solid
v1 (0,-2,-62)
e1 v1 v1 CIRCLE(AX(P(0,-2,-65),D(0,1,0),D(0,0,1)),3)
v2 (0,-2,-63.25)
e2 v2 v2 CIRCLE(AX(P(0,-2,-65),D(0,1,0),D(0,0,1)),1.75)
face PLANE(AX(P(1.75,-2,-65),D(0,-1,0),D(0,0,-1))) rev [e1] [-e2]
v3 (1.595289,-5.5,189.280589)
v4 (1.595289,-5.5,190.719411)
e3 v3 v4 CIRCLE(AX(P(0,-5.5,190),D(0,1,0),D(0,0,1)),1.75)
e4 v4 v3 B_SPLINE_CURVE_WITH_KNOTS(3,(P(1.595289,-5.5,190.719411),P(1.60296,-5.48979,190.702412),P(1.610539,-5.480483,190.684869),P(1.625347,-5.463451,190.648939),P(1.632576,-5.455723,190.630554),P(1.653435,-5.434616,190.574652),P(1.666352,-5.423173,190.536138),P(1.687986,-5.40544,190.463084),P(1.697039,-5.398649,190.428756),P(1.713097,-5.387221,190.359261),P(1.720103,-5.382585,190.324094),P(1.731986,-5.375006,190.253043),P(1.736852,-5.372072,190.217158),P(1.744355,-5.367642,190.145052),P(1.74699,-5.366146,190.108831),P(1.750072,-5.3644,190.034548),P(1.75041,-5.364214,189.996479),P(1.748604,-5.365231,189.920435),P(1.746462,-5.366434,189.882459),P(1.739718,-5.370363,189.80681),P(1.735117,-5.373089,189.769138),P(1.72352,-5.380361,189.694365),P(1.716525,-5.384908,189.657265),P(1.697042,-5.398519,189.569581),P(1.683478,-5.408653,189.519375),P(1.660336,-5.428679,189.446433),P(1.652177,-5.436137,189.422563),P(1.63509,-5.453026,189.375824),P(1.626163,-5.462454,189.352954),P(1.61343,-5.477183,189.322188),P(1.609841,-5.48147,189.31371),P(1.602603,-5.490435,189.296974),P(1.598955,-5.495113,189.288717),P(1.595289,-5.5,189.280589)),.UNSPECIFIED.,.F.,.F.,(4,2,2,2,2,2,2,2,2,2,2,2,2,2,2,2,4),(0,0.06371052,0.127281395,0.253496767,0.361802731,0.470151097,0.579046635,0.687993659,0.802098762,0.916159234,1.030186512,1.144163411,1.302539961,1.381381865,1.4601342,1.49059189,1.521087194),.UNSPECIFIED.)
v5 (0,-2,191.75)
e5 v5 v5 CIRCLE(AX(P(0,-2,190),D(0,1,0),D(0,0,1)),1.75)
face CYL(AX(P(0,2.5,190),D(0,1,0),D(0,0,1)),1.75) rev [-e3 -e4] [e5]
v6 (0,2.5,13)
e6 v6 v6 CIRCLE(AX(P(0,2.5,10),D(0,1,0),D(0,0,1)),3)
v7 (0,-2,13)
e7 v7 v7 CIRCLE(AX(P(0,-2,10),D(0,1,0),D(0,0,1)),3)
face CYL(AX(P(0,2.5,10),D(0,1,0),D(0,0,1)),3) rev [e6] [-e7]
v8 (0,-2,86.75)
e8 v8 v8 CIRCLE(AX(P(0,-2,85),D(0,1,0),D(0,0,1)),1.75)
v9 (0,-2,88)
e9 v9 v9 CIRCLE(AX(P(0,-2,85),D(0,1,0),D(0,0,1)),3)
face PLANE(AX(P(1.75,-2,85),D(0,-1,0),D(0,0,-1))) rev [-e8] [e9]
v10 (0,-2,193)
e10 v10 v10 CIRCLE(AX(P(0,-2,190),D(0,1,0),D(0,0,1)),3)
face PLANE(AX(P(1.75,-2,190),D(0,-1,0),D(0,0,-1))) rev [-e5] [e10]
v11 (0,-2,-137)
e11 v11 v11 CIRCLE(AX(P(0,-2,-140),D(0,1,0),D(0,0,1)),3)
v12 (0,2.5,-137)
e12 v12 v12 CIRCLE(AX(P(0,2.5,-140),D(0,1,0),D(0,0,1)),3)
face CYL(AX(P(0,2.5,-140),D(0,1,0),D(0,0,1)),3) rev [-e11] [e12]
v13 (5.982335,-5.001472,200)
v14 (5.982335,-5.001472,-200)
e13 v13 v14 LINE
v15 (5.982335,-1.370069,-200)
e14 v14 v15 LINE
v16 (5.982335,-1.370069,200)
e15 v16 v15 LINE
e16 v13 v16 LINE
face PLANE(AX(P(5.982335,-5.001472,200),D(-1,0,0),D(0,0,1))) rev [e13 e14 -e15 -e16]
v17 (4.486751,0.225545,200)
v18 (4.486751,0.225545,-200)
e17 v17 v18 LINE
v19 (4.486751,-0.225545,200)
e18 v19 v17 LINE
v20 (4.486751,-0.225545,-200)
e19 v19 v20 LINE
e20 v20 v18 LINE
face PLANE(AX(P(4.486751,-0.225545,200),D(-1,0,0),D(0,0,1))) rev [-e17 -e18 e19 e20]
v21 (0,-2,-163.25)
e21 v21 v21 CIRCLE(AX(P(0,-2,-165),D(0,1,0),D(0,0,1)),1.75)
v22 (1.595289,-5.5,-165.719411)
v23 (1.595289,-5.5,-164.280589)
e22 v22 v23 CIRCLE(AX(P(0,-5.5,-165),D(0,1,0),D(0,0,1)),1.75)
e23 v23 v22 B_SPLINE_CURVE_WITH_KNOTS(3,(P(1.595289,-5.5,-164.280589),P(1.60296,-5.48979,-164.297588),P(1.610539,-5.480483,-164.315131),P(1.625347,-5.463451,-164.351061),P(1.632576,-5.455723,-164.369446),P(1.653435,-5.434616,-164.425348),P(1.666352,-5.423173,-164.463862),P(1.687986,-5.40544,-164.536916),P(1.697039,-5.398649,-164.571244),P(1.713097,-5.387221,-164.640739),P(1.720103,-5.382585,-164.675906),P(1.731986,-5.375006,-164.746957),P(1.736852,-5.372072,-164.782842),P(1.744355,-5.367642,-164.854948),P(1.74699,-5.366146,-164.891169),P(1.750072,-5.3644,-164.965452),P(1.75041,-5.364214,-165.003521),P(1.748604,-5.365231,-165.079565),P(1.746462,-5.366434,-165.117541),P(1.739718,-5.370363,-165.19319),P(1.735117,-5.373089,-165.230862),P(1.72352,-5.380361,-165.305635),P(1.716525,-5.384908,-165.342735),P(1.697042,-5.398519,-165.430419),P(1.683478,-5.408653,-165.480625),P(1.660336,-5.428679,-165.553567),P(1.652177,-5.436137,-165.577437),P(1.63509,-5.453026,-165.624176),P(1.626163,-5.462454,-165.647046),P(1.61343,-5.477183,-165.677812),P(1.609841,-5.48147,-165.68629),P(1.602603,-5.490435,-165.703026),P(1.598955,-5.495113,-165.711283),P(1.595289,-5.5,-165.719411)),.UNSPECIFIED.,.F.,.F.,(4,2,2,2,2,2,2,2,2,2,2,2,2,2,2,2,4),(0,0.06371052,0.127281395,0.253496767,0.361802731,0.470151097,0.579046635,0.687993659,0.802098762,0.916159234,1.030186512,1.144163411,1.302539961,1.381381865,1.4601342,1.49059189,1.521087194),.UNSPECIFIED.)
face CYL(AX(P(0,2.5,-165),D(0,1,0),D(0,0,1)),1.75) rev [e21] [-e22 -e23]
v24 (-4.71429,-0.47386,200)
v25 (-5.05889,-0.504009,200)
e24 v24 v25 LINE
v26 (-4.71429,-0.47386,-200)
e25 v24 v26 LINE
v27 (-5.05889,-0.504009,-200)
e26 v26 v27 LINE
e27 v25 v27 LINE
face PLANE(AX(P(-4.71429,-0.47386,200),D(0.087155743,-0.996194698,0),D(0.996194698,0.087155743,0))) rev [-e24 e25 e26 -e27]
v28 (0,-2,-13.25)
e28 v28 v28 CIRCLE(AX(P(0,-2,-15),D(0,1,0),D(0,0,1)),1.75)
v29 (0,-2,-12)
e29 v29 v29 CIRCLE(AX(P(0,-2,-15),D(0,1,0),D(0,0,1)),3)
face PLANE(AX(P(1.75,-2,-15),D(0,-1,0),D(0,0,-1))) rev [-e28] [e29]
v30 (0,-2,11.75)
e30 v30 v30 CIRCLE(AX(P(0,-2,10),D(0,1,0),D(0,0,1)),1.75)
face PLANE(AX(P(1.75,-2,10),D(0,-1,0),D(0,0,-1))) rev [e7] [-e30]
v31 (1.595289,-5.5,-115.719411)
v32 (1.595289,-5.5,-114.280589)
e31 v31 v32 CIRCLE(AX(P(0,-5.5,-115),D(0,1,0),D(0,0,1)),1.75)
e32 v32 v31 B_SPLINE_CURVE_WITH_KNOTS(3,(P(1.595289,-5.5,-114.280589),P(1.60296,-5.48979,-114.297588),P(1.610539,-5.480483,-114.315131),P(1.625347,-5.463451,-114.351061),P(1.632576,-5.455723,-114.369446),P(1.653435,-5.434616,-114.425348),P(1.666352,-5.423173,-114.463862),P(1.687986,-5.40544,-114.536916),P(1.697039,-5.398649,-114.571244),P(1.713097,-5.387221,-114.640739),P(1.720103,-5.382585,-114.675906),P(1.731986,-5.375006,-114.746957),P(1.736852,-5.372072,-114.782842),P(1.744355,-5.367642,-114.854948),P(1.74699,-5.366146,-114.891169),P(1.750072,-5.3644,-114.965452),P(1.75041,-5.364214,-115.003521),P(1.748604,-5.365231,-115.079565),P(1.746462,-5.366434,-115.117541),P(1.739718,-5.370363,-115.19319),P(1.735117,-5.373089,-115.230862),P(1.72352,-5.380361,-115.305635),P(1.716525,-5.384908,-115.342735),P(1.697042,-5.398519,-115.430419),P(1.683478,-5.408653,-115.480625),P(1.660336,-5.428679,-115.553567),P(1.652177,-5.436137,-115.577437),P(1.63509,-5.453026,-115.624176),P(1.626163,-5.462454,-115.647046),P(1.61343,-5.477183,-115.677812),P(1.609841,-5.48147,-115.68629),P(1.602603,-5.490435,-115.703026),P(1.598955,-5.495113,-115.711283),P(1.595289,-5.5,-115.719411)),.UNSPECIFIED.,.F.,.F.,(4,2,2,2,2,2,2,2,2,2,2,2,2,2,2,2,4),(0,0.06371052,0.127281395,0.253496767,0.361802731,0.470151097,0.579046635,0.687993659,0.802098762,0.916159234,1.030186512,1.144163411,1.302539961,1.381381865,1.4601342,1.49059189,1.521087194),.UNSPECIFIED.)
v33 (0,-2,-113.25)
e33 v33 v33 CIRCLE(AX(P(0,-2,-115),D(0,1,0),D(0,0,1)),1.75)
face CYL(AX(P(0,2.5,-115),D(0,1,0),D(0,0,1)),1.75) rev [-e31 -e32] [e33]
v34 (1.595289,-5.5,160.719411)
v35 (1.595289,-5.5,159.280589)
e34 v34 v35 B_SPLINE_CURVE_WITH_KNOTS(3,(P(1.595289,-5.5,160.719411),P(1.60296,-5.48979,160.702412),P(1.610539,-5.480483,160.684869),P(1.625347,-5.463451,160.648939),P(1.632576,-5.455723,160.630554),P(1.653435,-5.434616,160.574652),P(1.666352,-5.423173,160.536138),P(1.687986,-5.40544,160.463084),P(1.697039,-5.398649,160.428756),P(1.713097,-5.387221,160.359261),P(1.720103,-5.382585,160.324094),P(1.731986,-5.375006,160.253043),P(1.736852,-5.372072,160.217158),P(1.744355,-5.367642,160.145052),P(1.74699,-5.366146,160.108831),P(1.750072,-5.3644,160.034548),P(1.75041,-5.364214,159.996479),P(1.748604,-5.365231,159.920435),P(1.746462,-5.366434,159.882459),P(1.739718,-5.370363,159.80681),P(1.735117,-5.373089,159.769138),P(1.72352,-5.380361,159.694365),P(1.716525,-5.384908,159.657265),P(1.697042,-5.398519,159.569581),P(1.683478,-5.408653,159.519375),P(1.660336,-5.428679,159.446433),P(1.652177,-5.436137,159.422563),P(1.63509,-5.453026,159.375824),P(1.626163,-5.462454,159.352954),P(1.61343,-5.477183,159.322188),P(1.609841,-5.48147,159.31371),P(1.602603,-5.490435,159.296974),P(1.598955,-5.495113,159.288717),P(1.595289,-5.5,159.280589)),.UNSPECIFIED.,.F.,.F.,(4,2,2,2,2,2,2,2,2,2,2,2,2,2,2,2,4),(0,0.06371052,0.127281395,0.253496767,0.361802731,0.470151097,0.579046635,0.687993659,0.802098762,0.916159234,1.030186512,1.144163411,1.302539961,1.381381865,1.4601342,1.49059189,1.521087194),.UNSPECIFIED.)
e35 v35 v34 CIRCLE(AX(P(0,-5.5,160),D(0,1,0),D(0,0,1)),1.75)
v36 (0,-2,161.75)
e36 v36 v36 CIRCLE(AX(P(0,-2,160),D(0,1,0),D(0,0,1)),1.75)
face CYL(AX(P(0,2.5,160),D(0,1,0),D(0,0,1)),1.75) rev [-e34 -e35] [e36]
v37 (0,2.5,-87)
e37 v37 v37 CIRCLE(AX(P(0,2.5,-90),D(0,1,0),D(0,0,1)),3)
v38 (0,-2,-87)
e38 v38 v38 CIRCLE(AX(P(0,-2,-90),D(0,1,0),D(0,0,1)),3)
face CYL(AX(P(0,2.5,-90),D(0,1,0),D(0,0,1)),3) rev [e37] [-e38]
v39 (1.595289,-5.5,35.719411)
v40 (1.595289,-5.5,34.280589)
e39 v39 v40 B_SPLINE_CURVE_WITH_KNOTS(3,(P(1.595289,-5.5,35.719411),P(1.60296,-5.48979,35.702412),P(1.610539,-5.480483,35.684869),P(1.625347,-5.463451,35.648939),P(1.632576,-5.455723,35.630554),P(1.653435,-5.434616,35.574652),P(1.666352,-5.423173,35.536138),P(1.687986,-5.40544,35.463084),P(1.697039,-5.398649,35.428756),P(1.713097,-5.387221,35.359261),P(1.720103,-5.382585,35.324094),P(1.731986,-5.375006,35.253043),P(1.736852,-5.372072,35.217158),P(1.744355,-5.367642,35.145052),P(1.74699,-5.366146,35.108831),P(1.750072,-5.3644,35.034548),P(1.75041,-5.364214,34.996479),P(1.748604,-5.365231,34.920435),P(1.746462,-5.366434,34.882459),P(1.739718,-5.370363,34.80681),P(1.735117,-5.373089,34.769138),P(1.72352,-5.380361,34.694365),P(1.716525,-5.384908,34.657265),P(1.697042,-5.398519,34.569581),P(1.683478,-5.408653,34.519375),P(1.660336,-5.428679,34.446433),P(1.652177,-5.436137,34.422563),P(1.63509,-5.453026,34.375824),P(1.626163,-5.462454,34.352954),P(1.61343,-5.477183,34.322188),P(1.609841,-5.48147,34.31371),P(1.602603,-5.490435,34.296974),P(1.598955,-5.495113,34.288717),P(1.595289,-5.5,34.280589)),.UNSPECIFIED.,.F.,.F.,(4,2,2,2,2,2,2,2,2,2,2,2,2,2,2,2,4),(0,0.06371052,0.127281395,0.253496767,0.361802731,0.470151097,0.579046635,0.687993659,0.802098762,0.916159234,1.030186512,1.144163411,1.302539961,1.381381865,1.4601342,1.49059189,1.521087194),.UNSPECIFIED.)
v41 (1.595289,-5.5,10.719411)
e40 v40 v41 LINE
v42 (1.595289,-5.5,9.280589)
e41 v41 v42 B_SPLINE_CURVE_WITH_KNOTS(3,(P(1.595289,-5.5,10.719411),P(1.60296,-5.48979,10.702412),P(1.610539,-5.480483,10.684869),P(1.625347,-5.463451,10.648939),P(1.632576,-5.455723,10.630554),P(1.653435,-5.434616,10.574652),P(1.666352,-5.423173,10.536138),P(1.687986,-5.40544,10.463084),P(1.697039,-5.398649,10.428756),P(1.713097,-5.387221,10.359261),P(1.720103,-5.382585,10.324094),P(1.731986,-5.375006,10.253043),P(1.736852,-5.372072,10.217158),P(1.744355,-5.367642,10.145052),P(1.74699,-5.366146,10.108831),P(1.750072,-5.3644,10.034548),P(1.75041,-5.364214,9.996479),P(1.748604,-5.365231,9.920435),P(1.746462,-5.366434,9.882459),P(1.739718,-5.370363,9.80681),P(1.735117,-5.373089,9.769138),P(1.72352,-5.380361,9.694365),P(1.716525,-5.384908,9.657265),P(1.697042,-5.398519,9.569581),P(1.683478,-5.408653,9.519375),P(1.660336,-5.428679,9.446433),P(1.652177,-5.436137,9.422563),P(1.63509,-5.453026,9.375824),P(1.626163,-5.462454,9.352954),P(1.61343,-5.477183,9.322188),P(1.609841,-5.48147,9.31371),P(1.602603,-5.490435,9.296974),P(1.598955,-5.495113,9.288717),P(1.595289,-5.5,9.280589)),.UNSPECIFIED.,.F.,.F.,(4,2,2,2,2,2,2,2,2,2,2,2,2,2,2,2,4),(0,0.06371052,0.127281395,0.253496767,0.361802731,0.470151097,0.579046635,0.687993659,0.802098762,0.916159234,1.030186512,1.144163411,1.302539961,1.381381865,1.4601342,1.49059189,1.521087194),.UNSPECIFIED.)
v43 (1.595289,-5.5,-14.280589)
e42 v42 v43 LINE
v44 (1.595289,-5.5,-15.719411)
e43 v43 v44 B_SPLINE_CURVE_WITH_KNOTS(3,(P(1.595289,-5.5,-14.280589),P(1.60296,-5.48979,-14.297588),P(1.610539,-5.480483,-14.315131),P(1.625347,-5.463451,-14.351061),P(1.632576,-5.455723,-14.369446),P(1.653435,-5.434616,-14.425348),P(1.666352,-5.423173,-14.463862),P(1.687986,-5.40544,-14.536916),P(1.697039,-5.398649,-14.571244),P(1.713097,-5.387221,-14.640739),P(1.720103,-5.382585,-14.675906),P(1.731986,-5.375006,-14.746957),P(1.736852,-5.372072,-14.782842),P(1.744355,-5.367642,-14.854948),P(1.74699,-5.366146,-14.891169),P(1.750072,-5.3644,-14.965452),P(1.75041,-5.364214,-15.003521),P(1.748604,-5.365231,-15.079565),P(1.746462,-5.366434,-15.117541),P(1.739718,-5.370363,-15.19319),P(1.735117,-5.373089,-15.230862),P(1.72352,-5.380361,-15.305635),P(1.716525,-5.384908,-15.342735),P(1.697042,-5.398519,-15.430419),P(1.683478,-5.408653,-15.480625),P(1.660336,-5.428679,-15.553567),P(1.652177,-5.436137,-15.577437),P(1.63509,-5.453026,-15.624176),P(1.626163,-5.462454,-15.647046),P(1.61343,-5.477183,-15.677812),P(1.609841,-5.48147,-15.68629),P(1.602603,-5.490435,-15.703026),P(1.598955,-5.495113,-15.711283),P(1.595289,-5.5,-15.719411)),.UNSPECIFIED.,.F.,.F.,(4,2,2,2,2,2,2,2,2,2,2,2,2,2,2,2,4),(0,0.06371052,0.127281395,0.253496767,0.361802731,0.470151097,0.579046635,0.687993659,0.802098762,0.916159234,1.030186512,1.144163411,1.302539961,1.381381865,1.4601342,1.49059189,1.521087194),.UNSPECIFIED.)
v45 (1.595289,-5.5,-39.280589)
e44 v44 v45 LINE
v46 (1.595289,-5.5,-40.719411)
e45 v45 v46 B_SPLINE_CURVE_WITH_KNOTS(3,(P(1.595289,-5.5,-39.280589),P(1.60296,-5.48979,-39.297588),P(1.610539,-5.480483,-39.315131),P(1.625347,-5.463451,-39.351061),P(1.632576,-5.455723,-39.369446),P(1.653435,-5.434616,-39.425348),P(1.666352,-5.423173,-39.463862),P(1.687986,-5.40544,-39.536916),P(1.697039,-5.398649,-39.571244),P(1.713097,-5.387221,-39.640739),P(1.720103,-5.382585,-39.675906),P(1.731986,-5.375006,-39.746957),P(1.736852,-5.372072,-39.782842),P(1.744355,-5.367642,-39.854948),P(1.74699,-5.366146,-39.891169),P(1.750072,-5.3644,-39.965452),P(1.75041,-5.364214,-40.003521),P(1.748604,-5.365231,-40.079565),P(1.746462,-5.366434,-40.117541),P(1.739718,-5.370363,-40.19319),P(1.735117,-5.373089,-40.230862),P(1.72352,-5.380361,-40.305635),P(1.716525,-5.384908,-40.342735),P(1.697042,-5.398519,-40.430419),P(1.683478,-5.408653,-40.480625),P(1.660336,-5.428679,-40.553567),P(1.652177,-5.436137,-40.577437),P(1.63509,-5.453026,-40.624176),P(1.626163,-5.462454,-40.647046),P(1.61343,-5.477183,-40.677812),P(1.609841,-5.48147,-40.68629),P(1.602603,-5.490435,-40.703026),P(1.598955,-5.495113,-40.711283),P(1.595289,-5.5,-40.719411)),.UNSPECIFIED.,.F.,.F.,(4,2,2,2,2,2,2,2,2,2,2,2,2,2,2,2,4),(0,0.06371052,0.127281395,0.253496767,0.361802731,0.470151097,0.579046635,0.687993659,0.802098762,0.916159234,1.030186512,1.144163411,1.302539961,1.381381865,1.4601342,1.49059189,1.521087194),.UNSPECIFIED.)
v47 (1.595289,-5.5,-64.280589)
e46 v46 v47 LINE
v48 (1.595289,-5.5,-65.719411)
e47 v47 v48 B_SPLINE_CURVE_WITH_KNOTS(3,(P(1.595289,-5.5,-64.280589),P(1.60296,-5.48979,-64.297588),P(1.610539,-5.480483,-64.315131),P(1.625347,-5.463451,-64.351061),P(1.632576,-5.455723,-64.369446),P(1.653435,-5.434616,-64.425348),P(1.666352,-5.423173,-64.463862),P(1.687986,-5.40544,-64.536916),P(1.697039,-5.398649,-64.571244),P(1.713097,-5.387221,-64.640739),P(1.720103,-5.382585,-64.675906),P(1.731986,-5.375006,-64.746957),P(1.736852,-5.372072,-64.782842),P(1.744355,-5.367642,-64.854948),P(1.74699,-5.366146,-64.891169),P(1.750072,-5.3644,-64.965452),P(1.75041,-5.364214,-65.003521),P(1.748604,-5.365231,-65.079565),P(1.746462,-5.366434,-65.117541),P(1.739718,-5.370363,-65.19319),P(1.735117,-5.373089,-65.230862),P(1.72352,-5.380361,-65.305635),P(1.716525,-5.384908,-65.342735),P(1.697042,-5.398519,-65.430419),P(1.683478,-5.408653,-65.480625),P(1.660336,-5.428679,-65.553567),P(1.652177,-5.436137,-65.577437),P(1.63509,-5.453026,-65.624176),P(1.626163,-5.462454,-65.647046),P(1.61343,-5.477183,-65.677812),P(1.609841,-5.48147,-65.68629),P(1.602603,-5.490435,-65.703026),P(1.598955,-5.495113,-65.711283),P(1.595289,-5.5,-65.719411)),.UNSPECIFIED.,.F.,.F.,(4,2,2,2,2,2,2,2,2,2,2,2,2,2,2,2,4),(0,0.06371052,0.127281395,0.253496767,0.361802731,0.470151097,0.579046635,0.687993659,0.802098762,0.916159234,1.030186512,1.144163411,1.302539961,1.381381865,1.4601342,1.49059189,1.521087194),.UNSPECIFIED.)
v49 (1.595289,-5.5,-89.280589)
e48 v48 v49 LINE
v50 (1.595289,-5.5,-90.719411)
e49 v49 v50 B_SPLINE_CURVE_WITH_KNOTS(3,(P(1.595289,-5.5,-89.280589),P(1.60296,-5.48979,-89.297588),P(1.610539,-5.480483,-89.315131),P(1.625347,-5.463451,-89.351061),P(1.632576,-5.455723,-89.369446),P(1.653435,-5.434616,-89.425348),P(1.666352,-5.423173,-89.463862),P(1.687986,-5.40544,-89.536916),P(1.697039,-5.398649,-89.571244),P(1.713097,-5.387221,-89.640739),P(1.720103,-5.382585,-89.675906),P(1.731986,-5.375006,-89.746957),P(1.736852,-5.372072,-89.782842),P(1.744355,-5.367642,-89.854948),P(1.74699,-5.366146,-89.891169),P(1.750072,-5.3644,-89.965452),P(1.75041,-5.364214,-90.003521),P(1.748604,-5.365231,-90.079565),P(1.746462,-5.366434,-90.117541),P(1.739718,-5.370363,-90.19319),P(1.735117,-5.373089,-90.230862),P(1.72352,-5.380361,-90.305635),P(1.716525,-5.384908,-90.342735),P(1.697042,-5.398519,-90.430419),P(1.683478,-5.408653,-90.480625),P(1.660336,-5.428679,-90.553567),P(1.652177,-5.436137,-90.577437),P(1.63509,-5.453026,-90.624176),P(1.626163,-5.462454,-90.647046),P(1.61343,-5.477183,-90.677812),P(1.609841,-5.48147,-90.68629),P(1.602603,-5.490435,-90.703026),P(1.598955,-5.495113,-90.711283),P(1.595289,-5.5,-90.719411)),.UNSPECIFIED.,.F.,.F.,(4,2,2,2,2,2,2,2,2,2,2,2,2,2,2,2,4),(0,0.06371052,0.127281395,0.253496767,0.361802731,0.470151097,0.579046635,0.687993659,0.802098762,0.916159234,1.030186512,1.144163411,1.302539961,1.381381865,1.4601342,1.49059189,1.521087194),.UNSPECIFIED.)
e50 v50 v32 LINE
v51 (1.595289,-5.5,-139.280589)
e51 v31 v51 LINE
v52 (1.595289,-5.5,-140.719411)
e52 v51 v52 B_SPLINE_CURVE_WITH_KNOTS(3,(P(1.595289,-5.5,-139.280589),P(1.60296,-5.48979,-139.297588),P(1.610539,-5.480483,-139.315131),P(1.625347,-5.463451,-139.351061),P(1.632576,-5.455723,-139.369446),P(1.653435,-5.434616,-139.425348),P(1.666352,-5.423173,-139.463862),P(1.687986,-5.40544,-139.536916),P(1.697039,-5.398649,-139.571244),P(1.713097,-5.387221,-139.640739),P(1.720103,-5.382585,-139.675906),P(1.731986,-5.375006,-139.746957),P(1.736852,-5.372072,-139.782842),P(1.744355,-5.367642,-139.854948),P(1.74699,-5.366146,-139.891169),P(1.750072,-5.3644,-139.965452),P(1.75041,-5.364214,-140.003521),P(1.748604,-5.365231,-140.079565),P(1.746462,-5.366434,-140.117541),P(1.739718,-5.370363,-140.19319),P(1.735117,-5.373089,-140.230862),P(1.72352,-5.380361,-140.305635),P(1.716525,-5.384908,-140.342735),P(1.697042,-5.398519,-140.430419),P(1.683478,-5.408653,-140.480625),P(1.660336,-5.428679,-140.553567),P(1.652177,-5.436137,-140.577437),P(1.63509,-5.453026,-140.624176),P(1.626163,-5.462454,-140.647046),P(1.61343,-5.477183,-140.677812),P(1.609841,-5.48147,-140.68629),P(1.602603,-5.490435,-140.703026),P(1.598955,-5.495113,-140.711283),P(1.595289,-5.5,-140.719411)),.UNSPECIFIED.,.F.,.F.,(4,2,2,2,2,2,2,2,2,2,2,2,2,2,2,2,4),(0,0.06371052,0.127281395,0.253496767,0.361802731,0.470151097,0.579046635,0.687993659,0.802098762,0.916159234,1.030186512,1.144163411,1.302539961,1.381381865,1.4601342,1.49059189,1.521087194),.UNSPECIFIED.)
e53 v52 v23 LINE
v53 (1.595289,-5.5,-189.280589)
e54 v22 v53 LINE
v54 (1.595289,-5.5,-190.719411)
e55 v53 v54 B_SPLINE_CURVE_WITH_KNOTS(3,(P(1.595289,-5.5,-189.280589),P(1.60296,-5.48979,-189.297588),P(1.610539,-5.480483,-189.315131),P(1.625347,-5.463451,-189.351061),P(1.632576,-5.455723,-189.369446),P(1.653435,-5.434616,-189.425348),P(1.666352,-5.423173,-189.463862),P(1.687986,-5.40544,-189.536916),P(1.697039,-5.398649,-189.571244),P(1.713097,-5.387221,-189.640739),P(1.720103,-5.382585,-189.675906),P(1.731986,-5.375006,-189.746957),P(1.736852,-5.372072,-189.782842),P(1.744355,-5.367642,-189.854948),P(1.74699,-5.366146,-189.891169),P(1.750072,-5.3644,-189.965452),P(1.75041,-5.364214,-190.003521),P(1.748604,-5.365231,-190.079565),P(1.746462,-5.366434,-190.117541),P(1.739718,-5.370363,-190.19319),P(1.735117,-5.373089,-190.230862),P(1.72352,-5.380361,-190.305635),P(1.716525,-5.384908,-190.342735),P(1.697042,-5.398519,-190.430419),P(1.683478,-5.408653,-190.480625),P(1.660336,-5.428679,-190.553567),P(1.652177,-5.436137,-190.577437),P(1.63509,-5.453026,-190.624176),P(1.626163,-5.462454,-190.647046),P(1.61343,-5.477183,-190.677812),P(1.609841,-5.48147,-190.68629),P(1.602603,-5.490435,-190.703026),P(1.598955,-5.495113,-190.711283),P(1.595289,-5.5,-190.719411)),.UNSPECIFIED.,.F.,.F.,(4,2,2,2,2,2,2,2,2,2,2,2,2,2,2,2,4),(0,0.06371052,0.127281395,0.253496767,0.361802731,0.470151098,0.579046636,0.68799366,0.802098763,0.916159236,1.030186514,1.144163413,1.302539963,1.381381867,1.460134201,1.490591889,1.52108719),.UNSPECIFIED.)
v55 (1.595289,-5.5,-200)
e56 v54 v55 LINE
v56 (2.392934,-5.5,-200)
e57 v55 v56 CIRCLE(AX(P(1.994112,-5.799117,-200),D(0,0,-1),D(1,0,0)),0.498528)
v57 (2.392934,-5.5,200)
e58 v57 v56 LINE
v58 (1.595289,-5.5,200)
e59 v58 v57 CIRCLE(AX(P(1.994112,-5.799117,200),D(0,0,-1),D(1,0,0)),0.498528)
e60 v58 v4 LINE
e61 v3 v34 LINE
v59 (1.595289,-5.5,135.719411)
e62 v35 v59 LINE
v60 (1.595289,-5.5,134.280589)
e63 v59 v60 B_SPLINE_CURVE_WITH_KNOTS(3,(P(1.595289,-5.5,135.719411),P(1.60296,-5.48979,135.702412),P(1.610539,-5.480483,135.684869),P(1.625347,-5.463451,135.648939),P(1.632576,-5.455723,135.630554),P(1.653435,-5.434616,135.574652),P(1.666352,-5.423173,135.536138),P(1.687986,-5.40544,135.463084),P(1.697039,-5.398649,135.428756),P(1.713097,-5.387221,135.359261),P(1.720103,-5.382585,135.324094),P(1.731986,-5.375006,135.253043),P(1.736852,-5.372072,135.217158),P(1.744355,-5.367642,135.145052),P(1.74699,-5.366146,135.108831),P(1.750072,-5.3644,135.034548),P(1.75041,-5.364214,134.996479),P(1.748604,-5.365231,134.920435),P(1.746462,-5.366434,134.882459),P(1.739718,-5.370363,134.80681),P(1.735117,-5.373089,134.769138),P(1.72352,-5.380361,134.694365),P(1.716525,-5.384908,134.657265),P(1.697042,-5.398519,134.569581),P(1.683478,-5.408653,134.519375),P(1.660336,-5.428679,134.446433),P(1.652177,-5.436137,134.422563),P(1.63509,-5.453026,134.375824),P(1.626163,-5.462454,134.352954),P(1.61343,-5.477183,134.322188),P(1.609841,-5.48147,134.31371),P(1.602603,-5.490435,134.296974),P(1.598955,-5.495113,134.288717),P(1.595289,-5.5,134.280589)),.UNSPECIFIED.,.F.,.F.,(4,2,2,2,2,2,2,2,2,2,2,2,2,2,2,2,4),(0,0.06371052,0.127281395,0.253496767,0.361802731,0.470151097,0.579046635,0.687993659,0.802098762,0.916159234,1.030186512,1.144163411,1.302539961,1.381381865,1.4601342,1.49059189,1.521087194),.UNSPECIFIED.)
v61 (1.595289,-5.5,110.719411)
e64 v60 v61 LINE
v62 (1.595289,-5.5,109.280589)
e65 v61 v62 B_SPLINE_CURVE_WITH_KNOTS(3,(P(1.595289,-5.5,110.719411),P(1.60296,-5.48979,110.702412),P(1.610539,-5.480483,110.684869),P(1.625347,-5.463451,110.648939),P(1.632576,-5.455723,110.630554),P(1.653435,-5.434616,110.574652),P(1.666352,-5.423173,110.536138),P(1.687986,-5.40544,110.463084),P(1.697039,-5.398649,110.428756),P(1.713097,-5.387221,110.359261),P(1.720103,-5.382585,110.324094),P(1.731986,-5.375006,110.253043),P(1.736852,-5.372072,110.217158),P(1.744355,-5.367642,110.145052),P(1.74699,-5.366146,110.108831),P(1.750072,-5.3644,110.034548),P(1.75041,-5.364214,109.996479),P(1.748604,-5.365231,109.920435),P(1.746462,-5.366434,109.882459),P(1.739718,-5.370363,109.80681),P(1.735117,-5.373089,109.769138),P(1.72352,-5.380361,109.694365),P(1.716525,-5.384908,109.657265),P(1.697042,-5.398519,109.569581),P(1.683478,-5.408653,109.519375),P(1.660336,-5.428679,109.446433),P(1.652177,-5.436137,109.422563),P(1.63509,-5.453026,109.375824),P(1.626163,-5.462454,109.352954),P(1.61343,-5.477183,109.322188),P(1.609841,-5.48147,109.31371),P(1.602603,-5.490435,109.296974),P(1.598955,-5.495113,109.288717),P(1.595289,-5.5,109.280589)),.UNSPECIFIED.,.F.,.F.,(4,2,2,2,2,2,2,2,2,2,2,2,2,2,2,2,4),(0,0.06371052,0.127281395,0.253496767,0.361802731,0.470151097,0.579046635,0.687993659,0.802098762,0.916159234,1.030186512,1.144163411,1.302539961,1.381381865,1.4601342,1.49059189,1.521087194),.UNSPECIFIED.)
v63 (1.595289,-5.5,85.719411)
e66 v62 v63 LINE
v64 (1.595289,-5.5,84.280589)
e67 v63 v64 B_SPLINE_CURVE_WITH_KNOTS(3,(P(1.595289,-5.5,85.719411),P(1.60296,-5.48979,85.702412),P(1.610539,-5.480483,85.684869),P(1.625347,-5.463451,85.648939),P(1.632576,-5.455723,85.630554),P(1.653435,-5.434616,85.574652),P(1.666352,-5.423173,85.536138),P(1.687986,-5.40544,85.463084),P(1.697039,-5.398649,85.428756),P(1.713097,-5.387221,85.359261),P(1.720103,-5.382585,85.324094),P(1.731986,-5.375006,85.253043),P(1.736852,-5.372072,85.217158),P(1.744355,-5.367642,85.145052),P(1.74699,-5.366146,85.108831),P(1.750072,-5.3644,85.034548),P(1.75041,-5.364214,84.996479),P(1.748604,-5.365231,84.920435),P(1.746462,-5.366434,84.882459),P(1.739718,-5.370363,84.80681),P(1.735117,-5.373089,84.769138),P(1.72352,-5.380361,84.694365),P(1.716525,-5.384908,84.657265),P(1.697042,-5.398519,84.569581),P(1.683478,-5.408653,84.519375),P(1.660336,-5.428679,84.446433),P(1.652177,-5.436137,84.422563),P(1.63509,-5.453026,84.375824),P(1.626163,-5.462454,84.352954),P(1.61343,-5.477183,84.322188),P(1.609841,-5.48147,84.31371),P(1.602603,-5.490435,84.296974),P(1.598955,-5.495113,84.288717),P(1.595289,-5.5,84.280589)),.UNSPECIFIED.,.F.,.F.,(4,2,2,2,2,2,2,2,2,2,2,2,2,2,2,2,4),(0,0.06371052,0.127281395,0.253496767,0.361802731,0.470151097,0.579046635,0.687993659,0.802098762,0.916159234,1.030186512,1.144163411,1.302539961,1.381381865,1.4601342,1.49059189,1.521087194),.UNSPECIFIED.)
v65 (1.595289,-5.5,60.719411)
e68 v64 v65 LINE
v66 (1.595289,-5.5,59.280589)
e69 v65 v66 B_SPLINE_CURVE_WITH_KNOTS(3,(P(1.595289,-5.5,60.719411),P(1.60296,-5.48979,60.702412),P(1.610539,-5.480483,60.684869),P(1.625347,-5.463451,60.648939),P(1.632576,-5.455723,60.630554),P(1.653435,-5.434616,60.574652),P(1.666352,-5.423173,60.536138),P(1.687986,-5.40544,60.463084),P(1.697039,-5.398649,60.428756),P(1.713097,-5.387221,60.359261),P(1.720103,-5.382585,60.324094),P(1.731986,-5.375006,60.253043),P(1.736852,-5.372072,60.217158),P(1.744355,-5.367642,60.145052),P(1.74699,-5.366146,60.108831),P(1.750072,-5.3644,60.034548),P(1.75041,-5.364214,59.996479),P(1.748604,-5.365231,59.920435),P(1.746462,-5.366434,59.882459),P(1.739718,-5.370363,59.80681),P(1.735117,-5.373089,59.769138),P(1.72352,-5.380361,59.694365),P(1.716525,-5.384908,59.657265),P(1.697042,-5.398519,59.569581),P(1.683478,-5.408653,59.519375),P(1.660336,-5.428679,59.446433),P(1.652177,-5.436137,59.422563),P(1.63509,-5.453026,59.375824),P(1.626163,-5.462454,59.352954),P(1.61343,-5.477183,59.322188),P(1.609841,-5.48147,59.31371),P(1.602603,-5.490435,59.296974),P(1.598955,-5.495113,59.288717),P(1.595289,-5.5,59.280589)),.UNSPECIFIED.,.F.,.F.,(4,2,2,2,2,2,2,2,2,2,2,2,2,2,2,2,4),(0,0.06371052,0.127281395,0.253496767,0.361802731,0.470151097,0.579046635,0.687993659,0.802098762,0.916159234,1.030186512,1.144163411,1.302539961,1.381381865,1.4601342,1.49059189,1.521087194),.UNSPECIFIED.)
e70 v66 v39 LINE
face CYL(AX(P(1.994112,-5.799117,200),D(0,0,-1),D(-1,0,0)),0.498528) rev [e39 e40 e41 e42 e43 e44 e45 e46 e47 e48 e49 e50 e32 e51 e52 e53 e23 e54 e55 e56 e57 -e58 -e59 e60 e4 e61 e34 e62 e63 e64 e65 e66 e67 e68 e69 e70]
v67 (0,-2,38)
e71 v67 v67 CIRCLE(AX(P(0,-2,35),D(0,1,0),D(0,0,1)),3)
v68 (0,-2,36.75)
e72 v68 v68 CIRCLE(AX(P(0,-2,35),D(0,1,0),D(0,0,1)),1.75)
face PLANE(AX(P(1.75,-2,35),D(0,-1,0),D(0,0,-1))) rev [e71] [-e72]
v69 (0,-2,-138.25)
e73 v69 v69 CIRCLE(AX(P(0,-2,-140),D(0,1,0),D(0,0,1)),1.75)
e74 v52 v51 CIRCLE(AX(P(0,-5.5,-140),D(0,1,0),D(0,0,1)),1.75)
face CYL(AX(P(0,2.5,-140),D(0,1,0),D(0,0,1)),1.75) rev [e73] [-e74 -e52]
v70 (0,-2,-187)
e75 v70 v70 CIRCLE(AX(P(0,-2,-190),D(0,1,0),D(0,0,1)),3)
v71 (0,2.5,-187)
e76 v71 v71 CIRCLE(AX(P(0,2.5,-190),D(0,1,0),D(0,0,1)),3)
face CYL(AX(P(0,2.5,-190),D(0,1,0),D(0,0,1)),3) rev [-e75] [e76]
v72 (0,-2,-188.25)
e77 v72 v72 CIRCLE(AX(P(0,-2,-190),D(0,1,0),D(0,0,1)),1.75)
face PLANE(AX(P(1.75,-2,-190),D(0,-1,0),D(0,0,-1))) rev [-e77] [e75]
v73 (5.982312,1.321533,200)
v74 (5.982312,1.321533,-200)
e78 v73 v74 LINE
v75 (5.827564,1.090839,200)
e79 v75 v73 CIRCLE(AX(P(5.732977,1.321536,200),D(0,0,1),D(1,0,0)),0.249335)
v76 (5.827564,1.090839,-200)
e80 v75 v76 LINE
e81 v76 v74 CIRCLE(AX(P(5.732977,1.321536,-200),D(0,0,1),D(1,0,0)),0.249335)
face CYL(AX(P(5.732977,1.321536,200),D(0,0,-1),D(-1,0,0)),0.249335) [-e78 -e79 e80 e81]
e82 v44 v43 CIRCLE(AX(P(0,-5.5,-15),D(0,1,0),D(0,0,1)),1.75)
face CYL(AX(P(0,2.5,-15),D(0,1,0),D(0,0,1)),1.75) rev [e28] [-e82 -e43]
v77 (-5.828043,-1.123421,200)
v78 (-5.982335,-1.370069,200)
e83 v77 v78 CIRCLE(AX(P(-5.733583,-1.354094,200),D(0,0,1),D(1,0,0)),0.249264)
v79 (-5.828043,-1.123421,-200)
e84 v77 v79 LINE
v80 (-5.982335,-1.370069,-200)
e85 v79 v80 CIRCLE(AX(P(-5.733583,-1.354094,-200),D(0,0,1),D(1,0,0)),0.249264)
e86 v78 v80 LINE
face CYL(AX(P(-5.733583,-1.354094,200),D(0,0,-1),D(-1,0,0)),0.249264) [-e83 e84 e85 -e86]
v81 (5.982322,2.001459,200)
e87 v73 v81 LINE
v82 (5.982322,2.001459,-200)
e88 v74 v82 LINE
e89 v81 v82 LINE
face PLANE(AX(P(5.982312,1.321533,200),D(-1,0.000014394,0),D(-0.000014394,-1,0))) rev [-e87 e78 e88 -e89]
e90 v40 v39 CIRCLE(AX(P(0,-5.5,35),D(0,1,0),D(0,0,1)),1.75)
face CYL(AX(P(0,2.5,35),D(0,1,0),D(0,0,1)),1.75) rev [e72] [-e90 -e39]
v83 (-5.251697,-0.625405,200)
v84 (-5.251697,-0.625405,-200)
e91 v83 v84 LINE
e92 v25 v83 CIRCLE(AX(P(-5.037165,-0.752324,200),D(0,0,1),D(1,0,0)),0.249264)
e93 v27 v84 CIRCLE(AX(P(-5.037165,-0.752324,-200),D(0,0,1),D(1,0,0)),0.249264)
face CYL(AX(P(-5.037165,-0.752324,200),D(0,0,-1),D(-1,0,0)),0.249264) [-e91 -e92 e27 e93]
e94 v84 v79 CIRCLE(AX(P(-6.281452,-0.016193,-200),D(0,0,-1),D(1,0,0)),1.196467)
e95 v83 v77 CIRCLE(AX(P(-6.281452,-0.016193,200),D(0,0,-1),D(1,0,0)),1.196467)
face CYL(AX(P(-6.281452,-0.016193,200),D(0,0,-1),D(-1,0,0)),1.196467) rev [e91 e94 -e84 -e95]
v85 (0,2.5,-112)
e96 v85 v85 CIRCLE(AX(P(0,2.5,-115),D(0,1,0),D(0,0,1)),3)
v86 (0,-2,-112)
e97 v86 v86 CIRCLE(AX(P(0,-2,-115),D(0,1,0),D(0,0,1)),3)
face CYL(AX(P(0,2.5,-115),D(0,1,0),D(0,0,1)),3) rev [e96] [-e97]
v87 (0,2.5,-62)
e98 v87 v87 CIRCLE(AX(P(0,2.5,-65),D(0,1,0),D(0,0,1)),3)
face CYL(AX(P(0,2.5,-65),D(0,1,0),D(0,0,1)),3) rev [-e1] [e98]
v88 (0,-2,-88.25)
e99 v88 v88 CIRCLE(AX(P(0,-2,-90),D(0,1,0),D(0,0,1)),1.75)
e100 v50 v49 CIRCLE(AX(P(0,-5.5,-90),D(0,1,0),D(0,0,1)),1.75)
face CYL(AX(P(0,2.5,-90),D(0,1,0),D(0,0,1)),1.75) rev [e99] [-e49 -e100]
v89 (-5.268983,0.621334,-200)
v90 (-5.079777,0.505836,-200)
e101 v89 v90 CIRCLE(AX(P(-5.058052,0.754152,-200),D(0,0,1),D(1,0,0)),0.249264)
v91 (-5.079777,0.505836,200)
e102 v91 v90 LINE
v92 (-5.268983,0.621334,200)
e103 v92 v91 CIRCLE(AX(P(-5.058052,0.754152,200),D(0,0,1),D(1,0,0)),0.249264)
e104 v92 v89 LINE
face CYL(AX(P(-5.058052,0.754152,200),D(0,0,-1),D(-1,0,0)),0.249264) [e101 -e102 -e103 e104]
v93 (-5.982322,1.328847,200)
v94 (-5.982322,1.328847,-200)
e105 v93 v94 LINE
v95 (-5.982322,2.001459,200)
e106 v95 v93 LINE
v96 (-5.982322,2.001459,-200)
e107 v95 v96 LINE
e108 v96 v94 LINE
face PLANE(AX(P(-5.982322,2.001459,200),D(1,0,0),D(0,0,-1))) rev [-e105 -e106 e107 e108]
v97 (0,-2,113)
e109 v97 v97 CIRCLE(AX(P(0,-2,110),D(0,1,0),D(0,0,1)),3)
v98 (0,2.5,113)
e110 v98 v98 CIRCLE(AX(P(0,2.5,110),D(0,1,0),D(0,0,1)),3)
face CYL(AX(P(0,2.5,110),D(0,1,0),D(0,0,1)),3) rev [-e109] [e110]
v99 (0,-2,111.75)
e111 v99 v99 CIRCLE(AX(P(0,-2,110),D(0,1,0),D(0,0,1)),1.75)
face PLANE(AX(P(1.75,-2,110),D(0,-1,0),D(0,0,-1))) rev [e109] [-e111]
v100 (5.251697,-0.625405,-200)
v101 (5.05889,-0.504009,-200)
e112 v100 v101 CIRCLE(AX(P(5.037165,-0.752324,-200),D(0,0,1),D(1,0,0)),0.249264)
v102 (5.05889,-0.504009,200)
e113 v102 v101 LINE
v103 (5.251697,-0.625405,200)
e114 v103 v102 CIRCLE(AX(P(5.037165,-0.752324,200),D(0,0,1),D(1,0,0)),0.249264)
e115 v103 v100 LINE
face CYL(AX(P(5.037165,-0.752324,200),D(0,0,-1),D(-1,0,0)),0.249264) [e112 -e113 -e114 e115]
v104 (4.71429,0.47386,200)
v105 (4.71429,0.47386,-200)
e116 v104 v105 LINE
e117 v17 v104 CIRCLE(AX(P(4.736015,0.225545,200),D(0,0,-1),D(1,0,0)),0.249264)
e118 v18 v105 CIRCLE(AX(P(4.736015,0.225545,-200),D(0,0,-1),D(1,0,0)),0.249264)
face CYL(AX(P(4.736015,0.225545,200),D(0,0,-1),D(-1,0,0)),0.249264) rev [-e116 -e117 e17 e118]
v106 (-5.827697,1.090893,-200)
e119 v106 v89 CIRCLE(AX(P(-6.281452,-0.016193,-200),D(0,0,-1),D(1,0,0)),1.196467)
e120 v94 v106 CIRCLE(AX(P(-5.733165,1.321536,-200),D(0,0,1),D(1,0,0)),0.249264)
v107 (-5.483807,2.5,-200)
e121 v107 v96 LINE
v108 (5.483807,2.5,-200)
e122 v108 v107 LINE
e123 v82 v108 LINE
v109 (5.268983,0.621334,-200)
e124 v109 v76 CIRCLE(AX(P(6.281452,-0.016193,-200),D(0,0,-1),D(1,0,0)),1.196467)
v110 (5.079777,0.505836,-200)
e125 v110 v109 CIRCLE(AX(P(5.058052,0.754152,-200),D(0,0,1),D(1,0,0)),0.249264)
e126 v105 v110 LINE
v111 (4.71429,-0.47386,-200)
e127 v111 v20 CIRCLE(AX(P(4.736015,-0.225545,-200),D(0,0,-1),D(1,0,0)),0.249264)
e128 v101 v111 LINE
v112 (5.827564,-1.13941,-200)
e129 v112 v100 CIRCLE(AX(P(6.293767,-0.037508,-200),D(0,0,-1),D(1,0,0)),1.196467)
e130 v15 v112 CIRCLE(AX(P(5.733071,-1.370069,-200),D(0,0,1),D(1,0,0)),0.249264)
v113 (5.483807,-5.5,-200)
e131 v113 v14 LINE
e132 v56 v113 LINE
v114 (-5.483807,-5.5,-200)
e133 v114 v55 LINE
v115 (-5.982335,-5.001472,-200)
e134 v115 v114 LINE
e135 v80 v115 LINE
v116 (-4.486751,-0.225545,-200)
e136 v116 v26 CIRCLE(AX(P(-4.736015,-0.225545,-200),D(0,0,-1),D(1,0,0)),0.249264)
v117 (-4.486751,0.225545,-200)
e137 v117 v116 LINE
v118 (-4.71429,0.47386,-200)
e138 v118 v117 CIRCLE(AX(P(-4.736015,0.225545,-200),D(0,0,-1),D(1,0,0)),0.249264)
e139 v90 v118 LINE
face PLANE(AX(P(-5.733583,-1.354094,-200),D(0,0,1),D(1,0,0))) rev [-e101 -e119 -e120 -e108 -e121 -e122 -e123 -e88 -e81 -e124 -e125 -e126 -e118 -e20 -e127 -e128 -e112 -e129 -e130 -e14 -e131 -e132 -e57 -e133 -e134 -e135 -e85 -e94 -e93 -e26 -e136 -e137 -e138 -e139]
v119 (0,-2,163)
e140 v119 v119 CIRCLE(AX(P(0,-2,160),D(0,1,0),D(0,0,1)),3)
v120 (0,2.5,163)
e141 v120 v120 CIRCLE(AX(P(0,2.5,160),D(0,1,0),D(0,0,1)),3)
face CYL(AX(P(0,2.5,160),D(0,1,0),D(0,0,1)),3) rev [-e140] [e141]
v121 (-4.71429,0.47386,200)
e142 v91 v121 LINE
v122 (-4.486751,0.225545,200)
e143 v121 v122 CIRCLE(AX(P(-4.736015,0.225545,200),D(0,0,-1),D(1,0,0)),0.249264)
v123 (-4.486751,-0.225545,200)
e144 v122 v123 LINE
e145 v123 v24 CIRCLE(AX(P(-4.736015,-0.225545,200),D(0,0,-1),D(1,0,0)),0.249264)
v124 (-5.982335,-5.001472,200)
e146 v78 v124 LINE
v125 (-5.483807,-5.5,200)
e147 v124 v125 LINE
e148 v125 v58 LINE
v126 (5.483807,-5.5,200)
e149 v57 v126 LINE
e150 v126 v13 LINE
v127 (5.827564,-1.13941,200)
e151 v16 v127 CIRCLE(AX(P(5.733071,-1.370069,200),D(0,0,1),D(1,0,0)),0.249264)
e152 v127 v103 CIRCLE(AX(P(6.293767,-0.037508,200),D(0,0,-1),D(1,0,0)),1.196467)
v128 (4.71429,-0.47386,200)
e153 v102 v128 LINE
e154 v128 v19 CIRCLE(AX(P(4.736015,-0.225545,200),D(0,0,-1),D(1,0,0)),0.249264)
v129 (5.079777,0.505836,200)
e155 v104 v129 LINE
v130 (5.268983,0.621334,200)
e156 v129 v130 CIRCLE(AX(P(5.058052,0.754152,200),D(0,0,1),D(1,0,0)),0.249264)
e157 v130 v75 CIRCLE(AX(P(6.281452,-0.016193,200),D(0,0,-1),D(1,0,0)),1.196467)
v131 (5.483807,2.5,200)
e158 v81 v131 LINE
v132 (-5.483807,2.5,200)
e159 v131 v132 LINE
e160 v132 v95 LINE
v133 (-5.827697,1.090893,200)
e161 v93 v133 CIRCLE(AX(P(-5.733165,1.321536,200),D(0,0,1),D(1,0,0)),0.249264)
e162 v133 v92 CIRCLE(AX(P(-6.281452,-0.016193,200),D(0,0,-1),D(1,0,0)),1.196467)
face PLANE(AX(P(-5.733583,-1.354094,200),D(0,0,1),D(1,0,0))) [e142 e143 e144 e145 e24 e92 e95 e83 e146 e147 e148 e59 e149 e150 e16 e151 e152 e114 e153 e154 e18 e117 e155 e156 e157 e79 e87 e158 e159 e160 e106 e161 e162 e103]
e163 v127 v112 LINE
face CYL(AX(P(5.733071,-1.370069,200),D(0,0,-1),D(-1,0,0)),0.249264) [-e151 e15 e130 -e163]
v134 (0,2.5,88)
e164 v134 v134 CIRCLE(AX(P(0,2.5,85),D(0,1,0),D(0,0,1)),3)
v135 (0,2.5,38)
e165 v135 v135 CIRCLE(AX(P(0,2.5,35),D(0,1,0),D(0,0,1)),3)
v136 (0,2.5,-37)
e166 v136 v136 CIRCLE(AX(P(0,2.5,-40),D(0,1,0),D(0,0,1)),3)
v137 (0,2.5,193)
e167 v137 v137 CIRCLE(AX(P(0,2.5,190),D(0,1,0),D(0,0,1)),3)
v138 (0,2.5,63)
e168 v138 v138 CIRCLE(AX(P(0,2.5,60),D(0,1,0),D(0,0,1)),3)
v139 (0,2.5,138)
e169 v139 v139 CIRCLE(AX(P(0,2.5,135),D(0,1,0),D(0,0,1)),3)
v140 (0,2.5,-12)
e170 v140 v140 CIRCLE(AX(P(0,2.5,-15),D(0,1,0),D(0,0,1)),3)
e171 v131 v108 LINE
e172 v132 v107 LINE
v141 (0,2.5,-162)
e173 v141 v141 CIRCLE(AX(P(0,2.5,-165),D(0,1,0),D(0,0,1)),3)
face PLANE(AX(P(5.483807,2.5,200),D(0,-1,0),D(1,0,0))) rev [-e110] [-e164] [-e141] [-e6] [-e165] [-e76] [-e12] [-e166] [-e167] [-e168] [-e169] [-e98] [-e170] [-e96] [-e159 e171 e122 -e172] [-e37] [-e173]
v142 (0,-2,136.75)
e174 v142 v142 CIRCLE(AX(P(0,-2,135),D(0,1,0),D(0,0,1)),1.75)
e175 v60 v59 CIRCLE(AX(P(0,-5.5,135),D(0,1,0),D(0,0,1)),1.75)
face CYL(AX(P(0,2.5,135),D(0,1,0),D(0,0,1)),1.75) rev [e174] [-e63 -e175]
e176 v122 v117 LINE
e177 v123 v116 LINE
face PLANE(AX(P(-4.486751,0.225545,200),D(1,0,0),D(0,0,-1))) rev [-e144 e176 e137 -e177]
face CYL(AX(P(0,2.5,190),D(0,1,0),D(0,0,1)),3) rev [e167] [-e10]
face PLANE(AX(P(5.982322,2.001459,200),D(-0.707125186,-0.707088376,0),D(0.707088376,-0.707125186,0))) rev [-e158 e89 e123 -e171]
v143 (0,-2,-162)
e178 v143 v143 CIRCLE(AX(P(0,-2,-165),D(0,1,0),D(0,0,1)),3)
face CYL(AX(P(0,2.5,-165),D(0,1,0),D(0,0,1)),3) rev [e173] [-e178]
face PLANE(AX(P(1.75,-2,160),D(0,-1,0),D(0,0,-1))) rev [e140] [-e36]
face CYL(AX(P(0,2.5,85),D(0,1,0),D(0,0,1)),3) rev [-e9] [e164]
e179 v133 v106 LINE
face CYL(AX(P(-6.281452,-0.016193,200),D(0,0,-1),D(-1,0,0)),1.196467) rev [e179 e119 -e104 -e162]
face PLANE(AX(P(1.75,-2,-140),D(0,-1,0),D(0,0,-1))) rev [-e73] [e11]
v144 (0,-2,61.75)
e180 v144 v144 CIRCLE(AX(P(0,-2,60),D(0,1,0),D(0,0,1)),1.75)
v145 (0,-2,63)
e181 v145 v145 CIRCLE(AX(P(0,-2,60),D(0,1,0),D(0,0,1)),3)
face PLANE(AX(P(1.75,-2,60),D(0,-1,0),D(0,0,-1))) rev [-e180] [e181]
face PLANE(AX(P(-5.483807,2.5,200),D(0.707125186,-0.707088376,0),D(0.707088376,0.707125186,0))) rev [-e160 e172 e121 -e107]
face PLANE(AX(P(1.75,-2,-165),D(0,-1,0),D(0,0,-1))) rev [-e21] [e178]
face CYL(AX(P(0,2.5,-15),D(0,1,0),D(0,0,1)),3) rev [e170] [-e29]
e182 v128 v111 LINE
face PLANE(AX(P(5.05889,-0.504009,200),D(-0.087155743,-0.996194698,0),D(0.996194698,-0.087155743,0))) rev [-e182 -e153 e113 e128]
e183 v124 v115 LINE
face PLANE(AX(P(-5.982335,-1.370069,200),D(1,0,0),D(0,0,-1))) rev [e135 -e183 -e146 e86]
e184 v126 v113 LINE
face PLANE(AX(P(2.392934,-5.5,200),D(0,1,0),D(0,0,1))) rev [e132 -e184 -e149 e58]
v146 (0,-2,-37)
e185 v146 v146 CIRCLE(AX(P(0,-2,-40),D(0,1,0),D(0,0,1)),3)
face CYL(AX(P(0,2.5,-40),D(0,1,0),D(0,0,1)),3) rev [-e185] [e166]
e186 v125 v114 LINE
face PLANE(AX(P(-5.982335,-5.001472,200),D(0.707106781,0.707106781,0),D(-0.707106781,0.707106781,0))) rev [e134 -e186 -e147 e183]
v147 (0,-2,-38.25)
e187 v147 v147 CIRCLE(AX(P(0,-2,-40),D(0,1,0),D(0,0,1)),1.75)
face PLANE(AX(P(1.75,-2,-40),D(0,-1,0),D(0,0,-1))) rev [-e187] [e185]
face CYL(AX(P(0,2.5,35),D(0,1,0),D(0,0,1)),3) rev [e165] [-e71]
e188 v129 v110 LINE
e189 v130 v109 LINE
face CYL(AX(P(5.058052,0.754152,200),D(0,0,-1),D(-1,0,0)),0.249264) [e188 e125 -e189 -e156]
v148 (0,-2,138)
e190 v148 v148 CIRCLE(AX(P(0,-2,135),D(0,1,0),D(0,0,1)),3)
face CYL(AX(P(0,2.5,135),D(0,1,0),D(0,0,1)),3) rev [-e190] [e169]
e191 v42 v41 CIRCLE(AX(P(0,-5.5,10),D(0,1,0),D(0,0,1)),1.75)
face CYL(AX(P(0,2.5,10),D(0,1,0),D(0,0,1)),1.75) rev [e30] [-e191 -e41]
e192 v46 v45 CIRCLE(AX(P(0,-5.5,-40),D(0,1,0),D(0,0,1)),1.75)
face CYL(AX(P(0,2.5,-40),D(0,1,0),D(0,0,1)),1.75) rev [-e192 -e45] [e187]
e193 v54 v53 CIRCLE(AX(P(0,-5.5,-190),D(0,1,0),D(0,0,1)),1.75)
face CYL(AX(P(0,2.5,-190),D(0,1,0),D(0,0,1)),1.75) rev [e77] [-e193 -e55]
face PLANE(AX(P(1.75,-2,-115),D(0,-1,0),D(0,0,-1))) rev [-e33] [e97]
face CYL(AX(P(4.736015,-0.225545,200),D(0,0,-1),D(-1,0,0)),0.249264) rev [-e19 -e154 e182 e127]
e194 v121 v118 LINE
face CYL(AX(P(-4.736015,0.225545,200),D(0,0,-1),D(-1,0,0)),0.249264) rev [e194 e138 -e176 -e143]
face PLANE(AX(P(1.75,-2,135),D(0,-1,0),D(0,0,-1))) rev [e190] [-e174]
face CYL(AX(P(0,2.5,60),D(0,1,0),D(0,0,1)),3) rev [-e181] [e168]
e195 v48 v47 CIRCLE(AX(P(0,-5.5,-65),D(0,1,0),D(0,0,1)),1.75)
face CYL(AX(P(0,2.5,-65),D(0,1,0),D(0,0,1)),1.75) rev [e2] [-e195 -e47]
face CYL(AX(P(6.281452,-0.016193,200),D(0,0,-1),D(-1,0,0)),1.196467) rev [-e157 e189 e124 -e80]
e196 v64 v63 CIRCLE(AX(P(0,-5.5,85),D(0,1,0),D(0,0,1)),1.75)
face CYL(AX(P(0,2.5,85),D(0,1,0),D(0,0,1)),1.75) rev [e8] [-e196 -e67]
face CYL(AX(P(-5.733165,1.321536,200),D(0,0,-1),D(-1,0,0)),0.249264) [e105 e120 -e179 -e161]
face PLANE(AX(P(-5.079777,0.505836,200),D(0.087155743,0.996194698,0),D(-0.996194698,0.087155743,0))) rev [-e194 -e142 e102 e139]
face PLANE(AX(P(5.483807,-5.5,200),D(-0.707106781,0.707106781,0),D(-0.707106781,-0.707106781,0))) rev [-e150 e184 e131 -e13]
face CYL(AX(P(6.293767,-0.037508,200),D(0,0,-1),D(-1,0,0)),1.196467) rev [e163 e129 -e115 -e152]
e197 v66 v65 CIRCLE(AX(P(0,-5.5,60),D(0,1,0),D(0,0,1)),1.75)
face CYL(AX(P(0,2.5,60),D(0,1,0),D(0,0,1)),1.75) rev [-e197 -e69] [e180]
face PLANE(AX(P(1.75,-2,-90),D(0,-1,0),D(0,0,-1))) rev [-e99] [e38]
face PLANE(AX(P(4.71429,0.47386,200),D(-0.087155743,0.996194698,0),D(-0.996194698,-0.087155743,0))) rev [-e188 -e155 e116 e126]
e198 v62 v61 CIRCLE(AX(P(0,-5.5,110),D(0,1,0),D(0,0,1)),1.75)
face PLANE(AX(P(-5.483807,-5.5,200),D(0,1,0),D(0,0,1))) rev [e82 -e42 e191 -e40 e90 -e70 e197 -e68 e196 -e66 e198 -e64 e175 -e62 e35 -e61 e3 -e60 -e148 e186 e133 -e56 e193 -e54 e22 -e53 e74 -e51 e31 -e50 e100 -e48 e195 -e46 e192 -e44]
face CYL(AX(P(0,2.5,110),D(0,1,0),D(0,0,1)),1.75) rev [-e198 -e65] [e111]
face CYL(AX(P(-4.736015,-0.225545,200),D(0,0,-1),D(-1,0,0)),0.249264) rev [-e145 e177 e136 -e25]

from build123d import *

# Parameters (mm, degrees)
RAIL_PROFILE_DEPTH             = 200
CBORE_FOR_M3_SHCS1_D           = 3.5
CBORE_FOR_M3_SHCS1_CBORE_D     = 6
CBORE_FOR_M3_SHCS1_CBORE_DEPTH = 4.5
FILL_START                     = -2.000000001
FILL_PATTERN1_OUTLINE_R        = 3
FILL_PATTERN1_DEPTH            = 4.5
FILL_START_2                   = -5.5
FILL_PATTERN1_2_OUTLINE_R      = 1.75
FILL_PATTERN1_2_DEPTH          = 3.499999999


# Read off the part's stored shape, not the designer's step: Fill Pattern1
with BuildPart() as part:
    # Sketch1 → RAIL PROFILE (new, symmetric)
    with BuildSketch(Plane.XY):
        with BuildLine():
            Line((-5.982334879, -1.370069213), (-5.982334879, -5.001472146))
            Line((-5.982334879, -5.001472146), (-5.483807025, -5.499999999))
            Line((-5.483807025, -5.499999999), (1.595289228, -5.499999999))
            ThreePointArc((1.595289228, -5.499999999), (1.994111552, -5.300588838), (2.392933875, -5.5))
            Line((2.392933875, -5.5), (5.483807024, -5.5))
            Line((5.483807024, -5.5), (5.982334878, -5.001472147))
            Line((5.982334878, -5.001472147), (5.982334878, -1.370069213))
            ThreePointArc((5.982334878, -1.370069213), (5.940056641, -1.231182813), (5.82756375, -1.139410101))
            ThreePointArc((5.82756375, -1.139410101), (5.497041405, -0.930122348), (5.251697363, -0.625405104))
            ThreePointArc((5.251697363, -0.625405104), (5.169975597, -0.541388466), (5.058890009, -0.504008866))
            Line((5.058890009, -0.504008866), (4.71429032, -0.473860299))
            ThreePointArc((4.71429032, -0.473860299), (4.552238438, -0.393945155), (4.486751147, -0.225544865))
            Line((4.486751147, -0.225544865), (4.486751147, 0.225544865))
            ThreePointArc((4.486751147, 0.225544865), (4.552238438, 0.393945155), (4.71429032, 0.473860299))
            Line((4.71429032, 0.473860299), (5.079776582, 0.505836204))
            ThreePointArc((5.079776582, 0.505836204), (5.187925163, 0.5413949), (5.268982803, 0.621333598))
            ThreePointArc((5.268982803, 0.621333598), (5.511607978, 0.899707672), (5.82756375, 1.09083865))
            ThreePointArc((5.82756375, 1.09083865), (5.940040963, 1.182638806), (5.982312115, 1.321532803))
            Line((5.982312115, 1.321532803), (5.982321902, 2.00145917))
            Line((5.982321902, 2.00145917), (5.483807025, 2.499999999))
            Line((5.483807025, 2.499999999), (-5.483807026, 2.499999999))
            Line((-5.483807026, 2.499999999), (-5.982321903, 2.00145917))
            Line((-5.982321903, 2.00145917), (-5.982321903, 1.32884687))
            ThreePointArc((-5.982321903, 1.32884687), (-5.942177076, 1.185718341), (-5.827697321, 1.090893402))
            ThreePointArc((-5.827697321, 1.090893402), (-5.511663234, 0.899754111), (-5.268982805, 0.621333597))
            ThreePointArc((-5.268982805, 0.621333597), (-5.187925164, 0.541394898), (-5.079776582, 0.505836204))
            Line((-5.079776582, 0.505836204), (-4.71429032, 0.473860299))
            ThreePointArc((-4.71429032, 0.473860299), (-4.552238438, 0.393945155), (-4.486751147, 0.225544865))
            Line((-4.486751147, 0.225544865), (-4.486751147, -0.225544865))
            ThreePointArc((-4.486751147, -0.225544865), (-4.552238438, -0.393945155), (-4.71429032, -0.473860299))
            Line((-4.71429032, -0.473860299), (-5.058890009, -0.504008866))
            ThreePointArc((-5.058890009, -0.504008866), (-5.169975597, -0.541388466), (-5.251697363, -0.625405104))
            ThreePointArc((-5.251697363, -0.625405104), (-5.499180752, -0.921502608), (-5.828043428, -1.123421157))
            ThreePointArc((-5.828043428, -1.123421157), (-5.944906256, -1.221900029), (-5.982334879, -1.370069213))
        make_face()
    extrude(amount=RAIL_PROFILE_DEPTH, both=True)

    # CBORE for M3 SHCS1 (through all)
    with Locations(Plane(origin=(0, 2.499999999, 0), x_dir=(1, 0, 0), z_dir=(0, 1, 0))):
        with Locations((0, 190)):
            cbore_for_m3_shcs1 = CounterBoreHole(CBORE_FOR_M3_SHCS1_D / 2, CBORE_FOR_M3_SHCS1_CBORE_D / 2, CBORE_FOR_M3_SHCS1_CBORE_DEPTH)

    # M3 END MIRROR: CBORE for M3 SHCS1 across plane
    add(cbore_for_m3_shcs1.mirror(Plane.XY), mode=Mode.SUBTRACT)

    # Fill Pattern1 outline → Fill Pattern1 (cut)
    with BuildSketch(Plane(origin=(0, 0, 0), x_dir=(1, 0, 0), z_dir=(0, 1, 0)).offset(FILL_START)):
        with Locations((0, 165)):
            Circle(FILL_PATTERN1_OUTLINE_R)
        with Locations((0, 140)):
            Circle(FILL_PATTERN1_OUTLINE_R)
        with Locations((0, 115)):
            Circle(FILL_PATTERN1_OUTLINE_R)
        with Locations((0, 90)):
            Circle(FILL_PATTERN1_OUTLINE_R)
        with Locations((0, 65)):
            Circle(FILL_PATTERN1_OUTLINE_R)
        with Locations((0, 40)):
            Circle(FILL_PATTERN1_OUTLINE_R)
        with Locations((0, 15)):
            Circle(FILL_PATTERN1_OUTLINE_R)
        with Locations((0, -10)):
            Circle(FILL_PATTERN1_OUTLINE_R)
        with Locations((0, -35)):
            Circle(FILL_PATTERN1_OUTLINE_R)
        with Locations((0, -60)):
            Circle(FILL_PATTERN1_OUTLINE_R)
        with Locations((0, -85)):
            Circle(FILL_PATTERN1_OUTLINE_R)
        with Locations((0, -110)):
            Circle(FILL_PATTERN1_OUTLINE_R)
        with Locations((0, -135)):
            Circle(FILL_PATTERN1_OUTLINE_R)
        with Locations((0, -160)):
            Circle(FILL_PATTERN1_OUTLINE_R)
    extrude(amount=FILL_PATTERN1_DEPTH, mode=Mode.SUBTRACT)

    # Fill Pattern1 2 outline → Fill Pattern1 2 (cut)
    with BuildSketch(Plane(origin=(0, 0, 0), x_dir=(1, 0, 0), z_dir=(0, 1, 0)).offset(FILL_START_2)):
        with Locations((0, 165)):
            Circle(FILL_PATTERN1_2_OUTLINE_R)
        with Locations((0, 140)):
            Circle(FILL_PATTERN1_2_OUTLINE_R)
        with Locations((0, 115)):
            Circle(FILL_PATTERN1_2_OUTLINE_R)
        with Locations((0, 90)):
            Circle(FILL_PATTERN1_2_OUTLINE_R)
        with Locations((0, 65)):
            Circle(FILL_PATTERN1_2_OUTLINE_R)
        with Locations((0, 40)):
            Circle(FILL_PATTERN1_2_OUTLINE_R)
        with Locations((0, 15)):
            Circle(FILL_PATTERN1_2_OUTLINE_R)
        with Locations((0, -10)):
            Circle(FILL_PATTERN1_2_OUTLINE_R)
        with Locations((0, -35)):
            Circle(FILL_PATTERN1_2_OUTLINE_R)
        with Locations((0, -60)):
            Circle(FILL_PATTERN1_2_OUTLINE_R)
        with Locations((0, -85)):
            Circle(FILL_PATTERN1_2_OUTLINE_R)
        with Locations((0, -110)):
            Circle(FILL_PATTERN1_2_OUTLINE_R)
        with Locations((0, -135)):
            Circle(FILL_PATTERN1_2_OUTLINE_R)
        with Locations((0, -160)):
            Circle(FILL_PATTERN1_2_OUTLINE_R)
    extrude(amount=FILL_PATTERN1_2_DEPTH, mode=Mode.SUBTRACT)


solid = part.part
